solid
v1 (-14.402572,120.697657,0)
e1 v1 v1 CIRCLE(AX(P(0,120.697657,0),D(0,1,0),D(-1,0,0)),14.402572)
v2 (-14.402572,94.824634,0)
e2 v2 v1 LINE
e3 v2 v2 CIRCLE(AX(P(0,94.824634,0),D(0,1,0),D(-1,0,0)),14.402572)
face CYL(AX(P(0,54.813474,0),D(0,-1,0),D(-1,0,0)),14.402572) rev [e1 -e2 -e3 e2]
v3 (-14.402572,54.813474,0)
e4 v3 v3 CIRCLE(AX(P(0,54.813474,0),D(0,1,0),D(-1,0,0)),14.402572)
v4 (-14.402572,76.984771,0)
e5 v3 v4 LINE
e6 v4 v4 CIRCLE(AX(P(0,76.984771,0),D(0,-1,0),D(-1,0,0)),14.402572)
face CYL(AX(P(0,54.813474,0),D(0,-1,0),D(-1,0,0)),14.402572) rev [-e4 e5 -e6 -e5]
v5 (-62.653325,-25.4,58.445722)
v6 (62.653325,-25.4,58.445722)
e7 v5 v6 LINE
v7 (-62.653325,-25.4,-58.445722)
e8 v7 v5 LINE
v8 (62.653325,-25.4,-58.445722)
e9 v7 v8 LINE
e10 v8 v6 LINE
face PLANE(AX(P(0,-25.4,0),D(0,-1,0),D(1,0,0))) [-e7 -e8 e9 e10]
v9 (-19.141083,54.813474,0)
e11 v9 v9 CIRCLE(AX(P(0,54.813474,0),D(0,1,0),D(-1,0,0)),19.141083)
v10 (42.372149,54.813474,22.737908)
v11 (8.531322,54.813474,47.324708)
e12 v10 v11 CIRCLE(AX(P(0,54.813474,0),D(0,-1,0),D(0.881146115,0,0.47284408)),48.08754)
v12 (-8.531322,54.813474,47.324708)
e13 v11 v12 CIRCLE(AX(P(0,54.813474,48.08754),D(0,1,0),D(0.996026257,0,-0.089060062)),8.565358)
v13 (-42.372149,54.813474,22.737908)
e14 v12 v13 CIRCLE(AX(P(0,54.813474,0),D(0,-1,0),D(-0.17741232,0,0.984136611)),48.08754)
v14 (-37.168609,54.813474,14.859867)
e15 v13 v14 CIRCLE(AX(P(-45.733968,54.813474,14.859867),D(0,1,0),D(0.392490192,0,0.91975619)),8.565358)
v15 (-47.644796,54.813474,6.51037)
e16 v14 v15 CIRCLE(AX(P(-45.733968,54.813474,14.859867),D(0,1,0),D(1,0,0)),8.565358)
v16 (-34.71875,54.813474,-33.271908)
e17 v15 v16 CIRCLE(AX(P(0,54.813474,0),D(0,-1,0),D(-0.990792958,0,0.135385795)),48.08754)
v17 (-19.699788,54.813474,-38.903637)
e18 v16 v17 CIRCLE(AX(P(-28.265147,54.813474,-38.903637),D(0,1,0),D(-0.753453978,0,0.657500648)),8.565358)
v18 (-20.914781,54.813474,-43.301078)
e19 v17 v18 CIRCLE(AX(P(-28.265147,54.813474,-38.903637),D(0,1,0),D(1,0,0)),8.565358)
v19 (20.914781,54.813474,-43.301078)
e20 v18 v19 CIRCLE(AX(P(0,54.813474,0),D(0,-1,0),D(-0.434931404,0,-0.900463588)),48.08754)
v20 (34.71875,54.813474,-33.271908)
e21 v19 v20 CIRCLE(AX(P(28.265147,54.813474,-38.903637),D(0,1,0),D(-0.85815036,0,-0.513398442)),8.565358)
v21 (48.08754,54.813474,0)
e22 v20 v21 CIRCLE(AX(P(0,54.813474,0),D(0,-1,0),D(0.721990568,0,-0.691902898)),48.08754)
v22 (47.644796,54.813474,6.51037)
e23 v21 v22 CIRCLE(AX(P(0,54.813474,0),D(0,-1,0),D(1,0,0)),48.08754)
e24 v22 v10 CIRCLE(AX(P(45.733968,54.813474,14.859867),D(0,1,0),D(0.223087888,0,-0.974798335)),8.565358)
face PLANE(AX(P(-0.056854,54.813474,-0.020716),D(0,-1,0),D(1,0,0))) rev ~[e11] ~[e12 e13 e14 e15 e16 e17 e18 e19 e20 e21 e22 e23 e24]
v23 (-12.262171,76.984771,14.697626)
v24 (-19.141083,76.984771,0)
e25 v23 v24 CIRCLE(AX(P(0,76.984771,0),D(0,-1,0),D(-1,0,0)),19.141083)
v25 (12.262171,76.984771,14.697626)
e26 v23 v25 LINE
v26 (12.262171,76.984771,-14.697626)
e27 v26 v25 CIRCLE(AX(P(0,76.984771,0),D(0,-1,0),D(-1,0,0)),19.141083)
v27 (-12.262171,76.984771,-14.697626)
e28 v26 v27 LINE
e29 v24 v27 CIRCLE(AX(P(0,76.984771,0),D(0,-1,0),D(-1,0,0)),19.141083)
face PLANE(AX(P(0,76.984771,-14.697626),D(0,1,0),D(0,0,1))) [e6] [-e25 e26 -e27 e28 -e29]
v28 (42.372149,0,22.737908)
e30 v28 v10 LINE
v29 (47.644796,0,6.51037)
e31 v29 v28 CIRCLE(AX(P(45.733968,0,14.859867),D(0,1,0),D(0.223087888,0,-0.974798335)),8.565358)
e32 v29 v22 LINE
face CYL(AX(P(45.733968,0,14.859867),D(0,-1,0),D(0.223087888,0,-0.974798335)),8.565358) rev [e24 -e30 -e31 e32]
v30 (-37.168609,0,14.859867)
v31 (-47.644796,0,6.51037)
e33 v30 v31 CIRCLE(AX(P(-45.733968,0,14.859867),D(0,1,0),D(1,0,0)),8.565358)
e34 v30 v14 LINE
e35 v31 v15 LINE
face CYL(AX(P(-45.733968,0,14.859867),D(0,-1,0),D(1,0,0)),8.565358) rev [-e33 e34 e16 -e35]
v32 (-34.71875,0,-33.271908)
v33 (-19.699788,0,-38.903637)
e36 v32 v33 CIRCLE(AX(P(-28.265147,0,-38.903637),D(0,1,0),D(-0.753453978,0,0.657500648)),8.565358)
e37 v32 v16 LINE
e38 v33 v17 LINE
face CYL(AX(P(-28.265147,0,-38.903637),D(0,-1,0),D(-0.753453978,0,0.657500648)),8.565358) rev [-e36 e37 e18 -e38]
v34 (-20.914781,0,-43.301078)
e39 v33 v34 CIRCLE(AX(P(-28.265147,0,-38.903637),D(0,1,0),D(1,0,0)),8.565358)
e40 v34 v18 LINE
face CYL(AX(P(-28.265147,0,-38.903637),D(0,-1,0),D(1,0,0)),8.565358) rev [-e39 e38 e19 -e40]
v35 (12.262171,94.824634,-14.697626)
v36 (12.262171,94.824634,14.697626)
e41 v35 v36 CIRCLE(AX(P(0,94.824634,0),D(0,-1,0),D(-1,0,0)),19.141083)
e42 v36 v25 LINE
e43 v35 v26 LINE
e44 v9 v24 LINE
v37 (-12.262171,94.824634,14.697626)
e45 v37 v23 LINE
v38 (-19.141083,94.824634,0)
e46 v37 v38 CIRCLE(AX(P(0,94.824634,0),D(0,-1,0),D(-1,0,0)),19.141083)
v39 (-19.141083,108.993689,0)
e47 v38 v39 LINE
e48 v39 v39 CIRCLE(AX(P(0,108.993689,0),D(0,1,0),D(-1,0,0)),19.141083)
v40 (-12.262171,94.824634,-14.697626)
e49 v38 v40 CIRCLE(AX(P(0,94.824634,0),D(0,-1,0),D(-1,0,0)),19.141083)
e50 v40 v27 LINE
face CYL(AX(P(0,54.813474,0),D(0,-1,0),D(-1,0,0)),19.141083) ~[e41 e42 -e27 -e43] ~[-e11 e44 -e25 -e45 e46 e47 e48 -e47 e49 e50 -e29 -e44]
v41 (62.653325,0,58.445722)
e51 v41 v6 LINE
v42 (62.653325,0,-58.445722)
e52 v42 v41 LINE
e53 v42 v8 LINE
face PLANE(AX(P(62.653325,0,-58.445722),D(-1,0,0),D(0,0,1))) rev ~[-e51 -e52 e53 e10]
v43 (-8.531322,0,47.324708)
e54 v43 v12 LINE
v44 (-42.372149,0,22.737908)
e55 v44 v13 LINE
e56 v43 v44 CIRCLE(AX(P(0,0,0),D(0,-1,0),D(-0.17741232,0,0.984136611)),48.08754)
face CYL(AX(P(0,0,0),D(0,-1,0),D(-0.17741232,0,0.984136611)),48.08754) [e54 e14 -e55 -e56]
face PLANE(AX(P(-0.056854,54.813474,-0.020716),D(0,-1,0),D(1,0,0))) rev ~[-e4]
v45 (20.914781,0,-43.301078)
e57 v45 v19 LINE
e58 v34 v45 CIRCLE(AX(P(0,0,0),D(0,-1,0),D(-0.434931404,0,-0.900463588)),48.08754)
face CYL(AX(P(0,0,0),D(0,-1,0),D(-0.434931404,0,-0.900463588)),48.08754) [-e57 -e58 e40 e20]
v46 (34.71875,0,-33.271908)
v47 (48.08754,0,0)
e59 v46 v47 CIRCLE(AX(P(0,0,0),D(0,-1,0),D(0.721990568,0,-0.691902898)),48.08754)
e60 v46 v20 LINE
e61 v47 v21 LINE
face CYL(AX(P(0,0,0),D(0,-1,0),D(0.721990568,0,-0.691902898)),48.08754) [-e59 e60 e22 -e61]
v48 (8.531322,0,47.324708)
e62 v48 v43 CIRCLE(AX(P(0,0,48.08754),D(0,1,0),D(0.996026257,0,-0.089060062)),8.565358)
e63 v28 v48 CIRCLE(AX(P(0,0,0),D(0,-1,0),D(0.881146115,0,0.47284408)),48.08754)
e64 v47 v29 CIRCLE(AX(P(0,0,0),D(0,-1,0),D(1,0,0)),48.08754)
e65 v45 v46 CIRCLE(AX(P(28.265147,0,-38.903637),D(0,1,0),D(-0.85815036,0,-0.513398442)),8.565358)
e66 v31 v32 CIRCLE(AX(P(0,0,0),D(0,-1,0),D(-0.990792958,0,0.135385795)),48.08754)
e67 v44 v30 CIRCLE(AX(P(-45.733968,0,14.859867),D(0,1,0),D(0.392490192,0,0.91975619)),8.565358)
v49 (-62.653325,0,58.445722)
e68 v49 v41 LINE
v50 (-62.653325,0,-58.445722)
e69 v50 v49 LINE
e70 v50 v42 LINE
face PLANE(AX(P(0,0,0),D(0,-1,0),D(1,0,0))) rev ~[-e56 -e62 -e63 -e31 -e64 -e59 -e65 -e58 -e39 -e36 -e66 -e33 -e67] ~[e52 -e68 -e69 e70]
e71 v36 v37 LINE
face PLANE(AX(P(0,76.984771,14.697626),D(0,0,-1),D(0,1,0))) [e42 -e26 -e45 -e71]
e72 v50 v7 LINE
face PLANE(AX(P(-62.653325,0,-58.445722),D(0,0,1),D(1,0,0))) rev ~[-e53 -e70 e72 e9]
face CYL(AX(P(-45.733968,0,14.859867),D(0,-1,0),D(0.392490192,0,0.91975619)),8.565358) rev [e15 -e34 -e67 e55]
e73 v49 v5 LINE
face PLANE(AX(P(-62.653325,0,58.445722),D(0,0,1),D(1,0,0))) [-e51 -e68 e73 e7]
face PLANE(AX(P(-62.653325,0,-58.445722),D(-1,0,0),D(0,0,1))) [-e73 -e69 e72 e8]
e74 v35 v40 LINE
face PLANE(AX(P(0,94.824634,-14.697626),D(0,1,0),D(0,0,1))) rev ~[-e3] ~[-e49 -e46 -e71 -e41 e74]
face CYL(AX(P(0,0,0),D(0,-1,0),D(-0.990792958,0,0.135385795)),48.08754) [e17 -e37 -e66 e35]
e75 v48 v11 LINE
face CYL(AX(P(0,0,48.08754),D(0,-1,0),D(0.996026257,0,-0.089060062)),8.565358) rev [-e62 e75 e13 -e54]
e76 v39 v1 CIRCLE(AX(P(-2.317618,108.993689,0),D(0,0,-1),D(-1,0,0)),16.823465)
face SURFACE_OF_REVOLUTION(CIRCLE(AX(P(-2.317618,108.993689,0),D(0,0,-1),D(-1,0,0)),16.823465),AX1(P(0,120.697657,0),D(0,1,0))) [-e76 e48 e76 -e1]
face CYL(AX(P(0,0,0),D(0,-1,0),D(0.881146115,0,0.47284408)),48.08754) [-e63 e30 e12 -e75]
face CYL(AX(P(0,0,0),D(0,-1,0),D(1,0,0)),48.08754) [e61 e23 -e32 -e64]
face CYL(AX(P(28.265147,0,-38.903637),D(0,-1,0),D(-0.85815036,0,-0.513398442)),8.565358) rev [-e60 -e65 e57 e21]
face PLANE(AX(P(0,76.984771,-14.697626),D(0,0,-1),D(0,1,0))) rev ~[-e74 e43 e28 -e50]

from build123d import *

# Parameters (mm, degrees)
F0_W          = 125.3066509962
F0_H          = 116.8914437294
F2_DEPTH      = 25.4
F3_DEPTH      = 54.8134744167
F4_R          = 19.141083189
F4_R_2        = 14.402572036
F5_DEPTH      = 65.8841822296
F7_W          = 17.8398638964
F7_H          = 29.3952524662
F8_DEPTH      = 25.4
F8_DEPTH_BACK = 25.4


# Not quite as in the source:
# - a fillet or chamfer that OpenCascade refuses, or shapes differently, is made with other operations: its cross-section is extruded or revolved along the edge and cut away or added


with BuildPart() as f2:
    # F0 (on Front) → F2 (new body)
    with BuildSketch(Plane.XZ):
        Rectangle(F0_W, F0_H)
    extrude(amount=F2_DEPTH)

    # F1 (on face) → F3 (join)
    with BuildSketch(Plane.XZ):
        with BuildLine():
            ThreePointArc((34.7187500455, -33.271908015), (44.6203470202, -17.9286390861), (48.0875396302, 0))
            ThreePointArc((48.0875396302, 0), (47.9767259565, 3.262703507), (47.6447956571, 6.5103697647))
            ThreePointArc((47.6447956571, 6.5103697647), (37.5878279083, 12.213025626), (42.3721487148, 22.7379084564))
            ThreePointArc((42.3721487148, 22.7379084564), (28.2651466136, 38.9036367785), (8.5313219634, 47.3247082742))
            ThreePointArc((8.5313219634, 47.3247082742), (0, 39.5221811368), (-8.5313219634, 47.3247082742))
            ThreePointArc((-8.5313219634, 47.3247082742), (-28.2651466136, 38.9036367785), (-42.3721487148, 22.7379084564))
            ThreePointArc((-42.3721487148, 22.7379084564), (-38.5869212276, 19.5805755678), (-37.1686094245, 14.8598669634))
            ThreePointArc((-37.1686094245, 14.8598669634), (-40.3955017751, 8.1616473967), (-47.6447956571, 6.5103697647))
            ThreePointArc((-47.6447956571, 6.5103697647), (-45.7339679179, -14.8598669634), (-34.7187500455, -33.271908015))
            ThreePointArc((-34.7187500455, -33.271908015), (-25.2578272797, -30.88357465), (-19.6997881202, -38.9036367785))
            ThreePointArc((-19.6997881202, -38.9036367785), (-20.0091221024, -41.1847385714), (-20.9147811398, -43.3010784803))
            ThreePointArc((-20.9147811398, -43.3010784803), (0, -48.0875396302), (20.9147811398, -43.3010784803))
            ThreePointArc((20.9147811398, -43.3010784803), (23.2305552106, -31.9741161944), (34.7187500455, -33.271908015))
        make_face()
    extrude(amount=-F3_DEPTH)

    # F4 (on face) → F5 (join)
    with BuildSketch(Plane(origin=(0, 54.8134744167, 0), x_dir=(-1, 0, 0), z_dir=(0, 1, 0))):
        Circle(F4_R)
        Circle(F4_R_2, mode=Mode.SUBTRACT)
    extrude(amount=F5_DEPTH)

    # F6: fillet of radius 16.8234648582 on 1 edges, made by hand

    # F6_s1 → F6_t2 (revolve, cut)
    with BuildSketch(Plane.XY):
        with BuildLine():
            ThreePointArc((-19.141083189, 108.9936887817), (-17.9115236115, 115.3070941964), (-14.402572036, 120.6976566464))
            Line((-14.402572036, 120.6976566464), (-19.141083189, 120.6976566464))
            Line((-19.141083189, 120.6976566464), (-19.141083189, 108.9936887817))
        make_face()
    revolve(axis=Axis((0, 120.6976566464, 0), (0, 1, 0)), mode=Mode.SUBTRACT)

    # F7 (on Right) → F8 (cut, two sides)
    with BuildSketch(Plane.YZ) as f8_sk:
        with Locations((85.9047025442, 0)):
            Rectangle(F7_W, F7_H)
    extrude(amount=-F8_DEPTH, mode=Mode.SUBTRACT)
    extrude(f8_sk.sketch, amount=F8_DEPTH_BACK, mode=Mode.SUBTRACT)


solid = f2.part
